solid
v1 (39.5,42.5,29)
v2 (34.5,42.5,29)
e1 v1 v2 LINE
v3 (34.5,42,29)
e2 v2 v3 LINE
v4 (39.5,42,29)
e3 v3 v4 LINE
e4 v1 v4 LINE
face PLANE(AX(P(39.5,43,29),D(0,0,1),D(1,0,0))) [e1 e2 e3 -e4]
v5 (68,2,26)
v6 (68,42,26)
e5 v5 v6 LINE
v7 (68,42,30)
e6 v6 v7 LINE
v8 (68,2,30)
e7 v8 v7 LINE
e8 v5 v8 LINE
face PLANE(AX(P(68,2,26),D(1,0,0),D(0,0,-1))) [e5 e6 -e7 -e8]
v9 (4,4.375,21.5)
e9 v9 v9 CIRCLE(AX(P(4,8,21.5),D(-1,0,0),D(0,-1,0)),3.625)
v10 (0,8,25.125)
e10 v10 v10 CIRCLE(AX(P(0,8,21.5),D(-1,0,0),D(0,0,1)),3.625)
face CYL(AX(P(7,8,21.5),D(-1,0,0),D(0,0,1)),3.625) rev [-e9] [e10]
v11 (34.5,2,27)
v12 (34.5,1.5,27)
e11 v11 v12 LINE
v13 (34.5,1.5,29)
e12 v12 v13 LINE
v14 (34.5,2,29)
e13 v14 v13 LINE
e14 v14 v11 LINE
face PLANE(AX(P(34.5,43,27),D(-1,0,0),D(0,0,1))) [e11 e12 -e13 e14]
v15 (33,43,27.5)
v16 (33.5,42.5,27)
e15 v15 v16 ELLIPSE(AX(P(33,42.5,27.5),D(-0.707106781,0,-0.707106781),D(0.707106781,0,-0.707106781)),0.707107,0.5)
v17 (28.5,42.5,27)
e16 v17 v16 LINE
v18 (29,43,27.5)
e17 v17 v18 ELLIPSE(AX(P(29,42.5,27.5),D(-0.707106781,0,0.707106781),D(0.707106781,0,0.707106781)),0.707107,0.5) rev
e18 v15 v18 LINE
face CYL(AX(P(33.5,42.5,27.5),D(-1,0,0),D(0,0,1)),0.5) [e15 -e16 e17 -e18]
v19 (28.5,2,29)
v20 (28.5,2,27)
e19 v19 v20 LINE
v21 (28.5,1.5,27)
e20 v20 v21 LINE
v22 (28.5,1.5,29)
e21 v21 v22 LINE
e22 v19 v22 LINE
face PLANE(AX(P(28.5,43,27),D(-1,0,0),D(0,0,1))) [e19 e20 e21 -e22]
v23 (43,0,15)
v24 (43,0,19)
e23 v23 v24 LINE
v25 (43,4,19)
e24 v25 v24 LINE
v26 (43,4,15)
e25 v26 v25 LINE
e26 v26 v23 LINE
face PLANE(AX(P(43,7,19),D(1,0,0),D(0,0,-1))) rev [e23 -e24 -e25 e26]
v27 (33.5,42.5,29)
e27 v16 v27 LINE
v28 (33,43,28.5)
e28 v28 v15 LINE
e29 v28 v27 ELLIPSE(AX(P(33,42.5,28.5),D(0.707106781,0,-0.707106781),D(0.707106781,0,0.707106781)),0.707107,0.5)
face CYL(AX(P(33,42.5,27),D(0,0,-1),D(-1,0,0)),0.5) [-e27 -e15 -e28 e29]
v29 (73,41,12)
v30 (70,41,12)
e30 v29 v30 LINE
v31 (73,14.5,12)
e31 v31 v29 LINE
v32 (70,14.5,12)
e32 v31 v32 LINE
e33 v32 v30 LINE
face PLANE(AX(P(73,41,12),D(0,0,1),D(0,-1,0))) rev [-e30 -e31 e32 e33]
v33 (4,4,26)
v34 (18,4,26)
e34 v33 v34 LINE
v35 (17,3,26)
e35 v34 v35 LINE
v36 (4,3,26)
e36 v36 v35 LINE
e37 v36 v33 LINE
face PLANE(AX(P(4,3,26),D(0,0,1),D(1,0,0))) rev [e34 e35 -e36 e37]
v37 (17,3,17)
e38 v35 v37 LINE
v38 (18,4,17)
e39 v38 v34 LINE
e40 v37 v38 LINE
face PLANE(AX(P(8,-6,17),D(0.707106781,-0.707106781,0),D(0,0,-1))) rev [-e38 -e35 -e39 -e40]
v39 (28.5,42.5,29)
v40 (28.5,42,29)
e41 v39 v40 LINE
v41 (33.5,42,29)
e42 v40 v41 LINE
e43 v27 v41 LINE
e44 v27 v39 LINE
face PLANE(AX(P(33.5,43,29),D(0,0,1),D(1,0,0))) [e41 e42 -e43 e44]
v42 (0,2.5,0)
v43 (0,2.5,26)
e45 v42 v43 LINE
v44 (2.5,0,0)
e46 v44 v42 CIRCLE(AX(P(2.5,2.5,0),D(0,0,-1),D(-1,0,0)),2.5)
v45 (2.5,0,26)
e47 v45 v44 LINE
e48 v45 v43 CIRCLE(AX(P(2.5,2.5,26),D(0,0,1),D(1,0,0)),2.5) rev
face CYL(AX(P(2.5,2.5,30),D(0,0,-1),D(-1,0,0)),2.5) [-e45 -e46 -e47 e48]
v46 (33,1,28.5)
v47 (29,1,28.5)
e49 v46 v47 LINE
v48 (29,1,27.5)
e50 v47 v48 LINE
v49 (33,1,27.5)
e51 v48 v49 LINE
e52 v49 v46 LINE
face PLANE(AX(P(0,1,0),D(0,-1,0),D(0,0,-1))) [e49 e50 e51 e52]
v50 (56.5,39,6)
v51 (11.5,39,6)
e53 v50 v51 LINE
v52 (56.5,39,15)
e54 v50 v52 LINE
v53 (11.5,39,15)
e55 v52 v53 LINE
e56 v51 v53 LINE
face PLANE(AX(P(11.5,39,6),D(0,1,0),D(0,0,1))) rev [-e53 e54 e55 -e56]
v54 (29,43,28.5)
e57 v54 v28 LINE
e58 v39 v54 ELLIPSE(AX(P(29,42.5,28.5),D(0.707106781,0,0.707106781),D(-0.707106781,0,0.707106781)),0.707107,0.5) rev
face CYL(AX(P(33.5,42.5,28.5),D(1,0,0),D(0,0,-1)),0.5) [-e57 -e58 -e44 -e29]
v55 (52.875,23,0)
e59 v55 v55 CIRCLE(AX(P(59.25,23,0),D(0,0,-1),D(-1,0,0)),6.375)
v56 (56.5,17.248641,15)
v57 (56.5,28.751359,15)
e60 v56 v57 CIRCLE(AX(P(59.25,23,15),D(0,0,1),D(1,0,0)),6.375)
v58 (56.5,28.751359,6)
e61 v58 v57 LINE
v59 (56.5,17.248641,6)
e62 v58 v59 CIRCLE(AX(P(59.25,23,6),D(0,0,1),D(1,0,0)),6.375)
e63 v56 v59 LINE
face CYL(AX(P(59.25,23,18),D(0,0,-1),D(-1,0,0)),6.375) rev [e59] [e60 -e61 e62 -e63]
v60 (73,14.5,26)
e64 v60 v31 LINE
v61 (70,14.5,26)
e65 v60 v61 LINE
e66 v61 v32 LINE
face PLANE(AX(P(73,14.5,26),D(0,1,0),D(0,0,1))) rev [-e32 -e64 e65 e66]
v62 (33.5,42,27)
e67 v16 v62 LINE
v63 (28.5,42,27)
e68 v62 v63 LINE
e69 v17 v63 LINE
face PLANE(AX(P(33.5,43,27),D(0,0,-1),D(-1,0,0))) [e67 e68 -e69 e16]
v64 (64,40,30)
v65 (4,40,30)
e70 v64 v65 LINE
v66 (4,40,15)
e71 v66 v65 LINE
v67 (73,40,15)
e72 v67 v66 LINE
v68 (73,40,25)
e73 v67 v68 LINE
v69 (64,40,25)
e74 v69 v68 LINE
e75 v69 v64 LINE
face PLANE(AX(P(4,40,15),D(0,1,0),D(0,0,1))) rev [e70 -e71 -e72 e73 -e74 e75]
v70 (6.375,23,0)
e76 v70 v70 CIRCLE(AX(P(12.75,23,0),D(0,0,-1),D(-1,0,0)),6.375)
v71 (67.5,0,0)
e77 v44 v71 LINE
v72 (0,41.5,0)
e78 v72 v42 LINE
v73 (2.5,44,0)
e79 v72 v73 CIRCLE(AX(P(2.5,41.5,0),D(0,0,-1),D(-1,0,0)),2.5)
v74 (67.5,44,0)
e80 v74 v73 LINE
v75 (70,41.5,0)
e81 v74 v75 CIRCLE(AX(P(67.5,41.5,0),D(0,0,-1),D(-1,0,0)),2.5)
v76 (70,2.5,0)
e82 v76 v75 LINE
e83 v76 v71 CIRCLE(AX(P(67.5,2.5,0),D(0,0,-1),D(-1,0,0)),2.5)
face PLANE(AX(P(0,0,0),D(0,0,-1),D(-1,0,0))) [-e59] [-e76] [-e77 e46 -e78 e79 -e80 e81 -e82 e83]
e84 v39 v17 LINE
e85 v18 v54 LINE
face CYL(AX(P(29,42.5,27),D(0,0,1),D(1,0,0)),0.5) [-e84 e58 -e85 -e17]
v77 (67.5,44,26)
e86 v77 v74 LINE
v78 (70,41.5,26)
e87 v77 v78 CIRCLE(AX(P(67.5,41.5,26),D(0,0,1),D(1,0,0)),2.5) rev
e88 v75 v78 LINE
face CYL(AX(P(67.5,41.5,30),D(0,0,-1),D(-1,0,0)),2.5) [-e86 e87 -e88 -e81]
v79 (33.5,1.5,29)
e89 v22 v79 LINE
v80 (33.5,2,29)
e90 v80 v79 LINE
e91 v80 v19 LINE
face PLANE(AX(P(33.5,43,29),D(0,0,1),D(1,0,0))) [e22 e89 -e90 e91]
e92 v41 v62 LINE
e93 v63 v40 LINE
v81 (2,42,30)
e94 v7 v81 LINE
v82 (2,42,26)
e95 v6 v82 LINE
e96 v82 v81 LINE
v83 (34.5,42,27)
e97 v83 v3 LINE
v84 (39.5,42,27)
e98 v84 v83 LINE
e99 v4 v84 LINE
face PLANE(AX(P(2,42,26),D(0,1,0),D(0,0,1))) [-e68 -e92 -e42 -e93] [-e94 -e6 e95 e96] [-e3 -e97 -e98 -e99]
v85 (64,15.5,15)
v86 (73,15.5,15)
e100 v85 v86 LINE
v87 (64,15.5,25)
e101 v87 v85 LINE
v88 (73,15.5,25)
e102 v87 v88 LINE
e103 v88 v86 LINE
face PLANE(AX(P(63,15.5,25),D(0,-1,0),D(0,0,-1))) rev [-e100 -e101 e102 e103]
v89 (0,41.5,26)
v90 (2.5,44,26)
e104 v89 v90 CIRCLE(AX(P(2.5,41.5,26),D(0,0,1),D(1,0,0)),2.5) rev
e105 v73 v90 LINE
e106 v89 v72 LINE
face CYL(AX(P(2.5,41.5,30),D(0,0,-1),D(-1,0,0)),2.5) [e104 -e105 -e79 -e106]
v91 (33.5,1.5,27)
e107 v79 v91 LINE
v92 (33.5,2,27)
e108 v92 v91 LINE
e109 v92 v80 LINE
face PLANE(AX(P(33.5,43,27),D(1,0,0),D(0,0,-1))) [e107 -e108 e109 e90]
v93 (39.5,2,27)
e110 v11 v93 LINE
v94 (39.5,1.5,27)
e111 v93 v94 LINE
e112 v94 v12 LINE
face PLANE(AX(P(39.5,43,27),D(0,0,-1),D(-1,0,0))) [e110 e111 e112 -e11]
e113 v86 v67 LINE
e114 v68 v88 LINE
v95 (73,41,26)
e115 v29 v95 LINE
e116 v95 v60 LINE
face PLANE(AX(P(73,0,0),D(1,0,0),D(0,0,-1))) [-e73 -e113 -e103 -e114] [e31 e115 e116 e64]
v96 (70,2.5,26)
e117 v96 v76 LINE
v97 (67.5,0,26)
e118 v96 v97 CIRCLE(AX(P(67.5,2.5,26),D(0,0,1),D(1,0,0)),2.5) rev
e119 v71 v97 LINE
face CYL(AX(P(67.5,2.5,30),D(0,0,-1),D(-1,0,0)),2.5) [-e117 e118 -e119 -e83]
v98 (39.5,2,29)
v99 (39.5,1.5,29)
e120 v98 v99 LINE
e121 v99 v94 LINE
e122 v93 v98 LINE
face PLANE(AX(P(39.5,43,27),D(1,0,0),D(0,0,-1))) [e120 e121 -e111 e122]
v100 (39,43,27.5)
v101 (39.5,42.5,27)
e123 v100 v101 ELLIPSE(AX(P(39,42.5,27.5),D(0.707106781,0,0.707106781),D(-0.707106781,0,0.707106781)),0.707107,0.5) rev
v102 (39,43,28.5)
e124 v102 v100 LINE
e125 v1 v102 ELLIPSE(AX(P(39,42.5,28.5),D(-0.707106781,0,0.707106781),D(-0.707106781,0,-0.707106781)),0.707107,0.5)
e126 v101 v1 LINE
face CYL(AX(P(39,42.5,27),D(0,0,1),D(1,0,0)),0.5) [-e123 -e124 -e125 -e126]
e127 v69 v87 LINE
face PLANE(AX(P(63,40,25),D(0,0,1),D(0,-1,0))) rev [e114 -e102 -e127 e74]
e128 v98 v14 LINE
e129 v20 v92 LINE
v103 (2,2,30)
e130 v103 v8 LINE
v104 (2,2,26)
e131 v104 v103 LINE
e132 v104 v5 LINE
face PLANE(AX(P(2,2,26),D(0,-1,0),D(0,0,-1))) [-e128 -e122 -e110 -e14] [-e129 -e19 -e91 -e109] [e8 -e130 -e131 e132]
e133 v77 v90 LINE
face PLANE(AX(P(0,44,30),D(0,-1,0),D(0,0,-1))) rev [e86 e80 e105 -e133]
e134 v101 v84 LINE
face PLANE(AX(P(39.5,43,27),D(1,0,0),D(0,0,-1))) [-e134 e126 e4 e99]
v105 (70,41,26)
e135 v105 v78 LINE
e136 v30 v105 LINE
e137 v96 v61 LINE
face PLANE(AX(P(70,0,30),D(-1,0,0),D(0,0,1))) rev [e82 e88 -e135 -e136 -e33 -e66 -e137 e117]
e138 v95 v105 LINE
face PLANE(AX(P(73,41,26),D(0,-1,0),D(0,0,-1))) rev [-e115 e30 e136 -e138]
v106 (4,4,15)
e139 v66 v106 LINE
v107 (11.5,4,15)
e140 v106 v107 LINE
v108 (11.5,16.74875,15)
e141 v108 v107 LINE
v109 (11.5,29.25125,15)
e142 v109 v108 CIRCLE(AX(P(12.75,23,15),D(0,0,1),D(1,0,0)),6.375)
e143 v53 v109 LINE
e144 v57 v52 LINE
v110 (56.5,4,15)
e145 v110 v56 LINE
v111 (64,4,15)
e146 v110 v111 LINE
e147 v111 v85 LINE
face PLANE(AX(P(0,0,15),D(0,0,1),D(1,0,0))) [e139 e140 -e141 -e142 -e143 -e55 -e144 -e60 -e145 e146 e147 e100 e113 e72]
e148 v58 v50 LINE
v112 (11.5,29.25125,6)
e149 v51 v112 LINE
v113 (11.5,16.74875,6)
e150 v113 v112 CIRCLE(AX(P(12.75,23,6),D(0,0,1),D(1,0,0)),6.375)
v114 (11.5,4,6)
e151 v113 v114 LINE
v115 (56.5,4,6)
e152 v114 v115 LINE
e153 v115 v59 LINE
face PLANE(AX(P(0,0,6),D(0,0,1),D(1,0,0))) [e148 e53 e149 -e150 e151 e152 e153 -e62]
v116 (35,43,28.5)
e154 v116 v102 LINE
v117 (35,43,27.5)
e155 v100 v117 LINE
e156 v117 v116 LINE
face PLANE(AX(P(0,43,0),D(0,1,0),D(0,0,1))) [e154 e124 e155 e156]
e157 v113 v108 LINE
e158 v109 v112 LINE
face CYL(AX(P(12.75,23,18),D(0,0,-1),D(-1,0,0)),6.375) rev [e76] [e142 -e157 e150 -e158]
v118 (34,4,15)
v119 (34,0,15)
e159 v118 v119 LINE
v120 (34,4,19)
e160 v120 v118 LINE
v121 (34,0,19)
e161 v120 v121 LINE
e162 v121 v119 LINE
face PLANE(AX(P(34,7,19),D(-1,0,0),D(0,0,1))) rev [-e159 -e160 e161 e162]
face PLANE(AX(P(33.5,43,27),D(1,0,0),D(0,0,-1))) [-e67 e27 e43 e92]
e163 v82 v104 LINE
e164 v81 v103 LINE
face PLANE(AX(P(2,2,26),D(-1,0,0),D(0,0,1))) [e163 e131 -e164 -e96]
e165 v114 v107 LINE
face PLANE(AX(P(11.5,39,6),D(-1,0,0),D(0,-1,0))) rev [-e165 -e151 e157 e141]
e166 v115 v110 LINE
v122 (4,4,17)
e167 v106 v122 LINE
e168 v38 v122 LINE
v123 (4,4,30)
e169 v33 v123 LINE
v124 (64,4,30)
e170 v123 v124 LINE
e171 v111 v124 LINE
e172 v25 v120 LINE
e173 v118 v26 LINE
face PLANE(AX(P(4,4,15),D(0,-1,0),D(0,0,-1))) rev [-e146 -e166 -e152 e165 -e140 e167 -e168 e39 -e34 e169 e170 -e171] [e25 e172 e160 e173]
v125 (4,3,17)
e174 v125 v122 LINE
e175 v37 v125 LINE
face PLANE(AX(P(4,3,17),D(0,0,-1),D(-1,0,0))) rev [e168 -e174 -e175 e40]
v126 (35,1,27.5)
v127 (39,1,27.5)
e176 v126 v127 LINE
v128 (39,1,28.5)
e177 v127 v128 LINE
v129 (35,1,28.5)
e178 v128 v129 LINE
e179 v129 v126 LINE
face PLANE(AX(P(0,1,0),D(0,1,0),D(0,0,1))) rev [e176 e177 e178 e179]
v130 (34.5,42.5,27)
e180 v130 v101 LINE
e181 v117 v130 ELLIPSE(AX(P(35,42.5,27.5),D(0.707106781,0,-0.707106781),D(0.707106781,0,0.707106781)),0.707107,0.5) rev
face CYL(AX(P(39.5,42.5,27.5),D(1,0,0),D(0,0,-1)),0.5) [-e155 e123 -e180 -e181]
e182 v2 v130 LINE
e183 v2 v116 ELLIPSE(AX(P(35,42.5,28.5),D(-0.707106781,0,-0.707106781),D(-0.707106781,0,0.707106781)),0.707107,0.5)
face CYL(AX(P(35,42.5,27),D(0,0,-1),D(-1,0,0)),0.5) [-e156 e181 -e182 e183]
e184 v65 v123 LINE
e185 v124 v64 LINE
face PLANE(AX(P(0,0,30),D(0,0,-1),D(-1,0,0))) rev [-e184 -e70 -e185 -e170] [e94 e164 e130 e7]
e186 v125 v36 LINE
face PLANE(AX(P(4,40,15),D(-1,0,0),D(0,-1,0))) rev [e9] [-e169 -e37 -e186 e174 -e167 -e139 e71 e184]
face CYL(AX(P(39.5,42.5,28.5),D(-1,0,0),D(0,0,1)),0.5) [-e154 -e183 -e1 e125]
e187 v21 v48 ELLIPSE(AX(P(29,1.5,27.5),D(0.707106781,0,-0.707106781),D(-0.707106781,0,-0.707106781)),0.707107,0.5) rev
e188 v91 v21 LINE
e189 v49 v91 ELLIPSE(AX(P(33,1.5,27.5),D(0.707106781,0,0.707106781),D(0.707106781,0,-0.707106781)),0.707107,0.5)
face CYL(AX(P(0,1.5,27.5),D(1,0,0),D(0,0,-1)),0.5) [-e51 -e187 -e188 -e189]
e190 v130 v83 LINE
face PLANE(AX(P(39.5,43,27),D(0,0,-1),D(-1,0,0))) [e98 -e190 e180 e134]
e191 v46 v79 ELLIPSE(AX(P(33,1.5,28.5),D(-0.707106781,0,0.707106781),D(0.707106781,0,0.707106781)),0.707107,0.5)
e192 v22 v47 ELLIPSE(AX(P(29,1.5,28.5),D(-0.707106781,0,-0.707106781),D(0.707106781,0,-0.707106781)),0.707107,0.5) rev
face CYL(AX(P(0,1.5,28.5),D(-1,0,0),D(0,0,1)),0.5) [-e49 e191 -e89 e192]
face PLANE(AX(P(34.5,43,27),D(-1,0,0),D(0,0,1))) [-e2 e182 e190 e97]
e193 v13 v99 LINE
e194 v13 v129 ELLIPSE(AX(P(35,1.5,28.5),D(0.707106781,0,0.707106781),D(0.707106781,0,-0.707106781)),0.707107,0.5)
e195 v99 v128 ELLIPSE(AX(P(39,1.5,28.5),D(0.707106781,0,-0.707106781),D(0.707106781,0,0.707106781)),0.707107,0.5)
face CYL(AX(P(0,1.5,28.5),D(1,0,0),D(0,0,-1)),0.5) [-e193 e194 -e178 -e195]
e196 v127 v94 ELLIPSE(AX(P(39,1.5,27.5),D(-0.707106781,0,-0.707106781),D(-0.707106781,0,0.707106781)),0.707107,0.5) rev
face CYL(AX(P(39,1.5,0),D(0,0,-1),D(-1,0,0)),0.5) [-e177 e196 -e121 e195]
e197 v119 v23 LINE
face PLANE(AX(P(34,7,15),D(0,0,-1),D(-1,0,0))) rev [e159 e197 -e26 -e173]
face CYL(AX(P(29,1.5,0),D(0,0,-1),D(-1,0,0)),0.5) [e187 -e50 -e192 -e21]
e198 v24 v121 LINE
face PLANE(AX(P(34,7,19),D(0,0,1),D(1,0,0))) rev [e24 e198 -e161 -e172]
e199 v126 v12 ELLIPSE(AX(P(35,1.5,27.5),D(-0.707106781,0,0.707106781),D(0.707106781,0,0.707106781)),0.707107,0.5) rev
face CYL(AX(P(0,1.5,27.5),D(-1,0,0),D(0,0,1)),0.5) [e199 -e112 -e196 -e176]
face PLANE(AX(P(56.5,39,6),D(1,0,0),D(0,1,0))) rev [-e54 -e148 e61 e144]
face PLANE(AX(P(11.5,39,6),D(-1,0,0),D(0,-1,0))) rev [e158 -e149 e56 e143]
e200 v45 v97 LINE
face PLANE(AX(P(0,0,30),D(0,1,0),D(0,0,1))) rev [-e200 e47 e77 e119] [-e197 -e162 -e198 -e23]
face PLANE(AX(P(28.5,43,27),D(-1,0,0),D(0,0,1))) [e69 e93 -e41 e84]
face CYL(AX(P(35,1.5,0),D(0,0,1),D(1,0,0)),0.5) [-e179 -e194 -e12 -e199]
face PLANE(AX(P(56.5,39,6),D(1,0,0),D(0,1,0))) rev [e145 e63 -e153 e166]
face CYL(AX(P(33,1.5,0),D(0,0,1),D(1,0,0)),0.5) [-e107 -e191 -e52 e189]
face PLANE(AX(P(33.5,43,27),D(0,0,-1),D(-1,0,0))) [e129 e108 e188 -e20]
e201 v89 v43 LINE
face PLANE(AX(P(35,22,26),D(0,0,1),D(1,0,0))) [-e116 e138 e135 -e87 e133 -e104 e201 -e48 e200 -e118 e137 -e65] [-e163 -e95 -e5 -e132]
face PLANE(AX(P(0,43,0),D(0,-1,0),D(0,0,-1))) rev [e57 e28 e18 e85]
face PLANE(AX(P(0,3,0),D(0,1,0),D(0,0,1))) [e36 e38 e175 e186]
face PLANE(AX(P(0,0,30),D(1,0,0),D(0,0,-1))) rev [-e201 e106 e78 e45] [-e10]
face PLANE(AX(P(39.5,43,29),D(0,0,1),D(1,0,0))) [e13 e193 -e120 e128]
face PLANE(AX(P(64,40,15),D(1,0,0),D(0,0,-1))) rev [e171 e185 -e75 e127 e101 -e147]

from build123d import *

# Parameters (mm, degrees)
SKETCH1_W                   = 70
SKETCH1_H                   = 44
MIAN_BOSS_EXTRUDE_DEPTH     = 30
SKETCH2_W                   = 60
SKETCH2_H                   = 36
MAIN_CUT_DEPTH              = 15
SKETCH4_W                   = 45
SKETCH4_H                   = 35
BATTERY_CUT_DEPTH           = 9
SKETCH5_R                   = 6.375
ELCTRODE_CUT_DEPTH          = 18
SKETCH6_W                   = 10
SKETCH6_H                   = 24.5
USB_C_CUT_DEPTH             = 7
SKETCH7_R                   = 3.625
BUTTON_CUT_DEPTH            = 7
SKETCH8_W                   = 9
SKETCH8_H                   = 4
SWITCH_CUT_DEPTH            = 7
OUTSIDE_FILLET_R            = 2.5
SKETCH10_OUTSIDE_W          = 89.59
SKETCH10_OUTSIDE_H          = 63.59
SKETCH10_OUTSIDE_W_2        = 66
SKETCH10_OUTSIDE_H_2        = 40
OUTER_LID_EXTRUDE_DEPTH     = 4
LID_SNAP_EXTRUDE_DEPTH      = 1
LID_SNAP_EXTRUDE_DEPTH_BACK = 41
SKETCH11_W                  = 5
SKETCH11_H                  = 2
SKETCH13_W                  = 11
SKETCH13_H                  = 36
INNER_LID_EXTRUDE_DEPTH     = 3
SKETCH14_W                  = 14
SKETCH14_H                  = 26.5
SKETCH14_W_2                = 10
SKETCH14_H_2                = 24.5
USB_COVER_EXTRUDE_DEPTH     = 3
SKETCH15_W                  = 4
SKETCH15_H                  = 9
BUTTON_SIDE_CUT_DEPTH       = 1
CHAMFER1_SIZE               = 10
LID_SNAP_FILLET_R           = 0.5


with BuildPart() as part:
    # Sketch1 → Mian Boss Extrude (new body)
    with BuildSketch(Plane.XY):
        with Locations((35, 22)):
            Rectangle(SKETCH1_W, SKETCH1_H)
    extrude(amount=MIAN_BOSS_EXTRUDE_DEPTH)

    # Sketch2 → Main cut (cut)
    with BuildSketch(Plane.XY.offset(30)):
        with Locations((34, 22)):
            Rectangle(SKETCH2_W, SKETCH2_H)
    extrude(amount=-MAIN_CUT_DEPTH, mode=Mode.SUBTRACT)

    # Sketch4 → Battery Cut (cut)
    with BuildSketch(Plane.XY.offset(15)):
        with Locations((34, 21.5)):
            Rectangle(SKETCH4_W, SKETCH4_H)
    extrude(amount=-BATTERY_CUT_DEPTH, mode=Mode.SUBTRACT)

    # Sketch5 → Elctrode Cut (cut)
    with BuildSketch(Plane(origin=(0, 0, 0), x_dir=(-1, 0, 0), z_dir=(0, 0, -1))):
        with Locations((-59.25, 23)):
            Circle(SKETCH5_R)
        with Locations((-12.75, 23)):
            Circle(SKETCH5_R)
    extrude(amount=-ELCTRODE_CUT_DEPTH, mode=Mode.SUBTRACT)

    # Sketch6 → USB-c Cut (cut)
    with BuildSketch(Plane(origin=(70, 0, 0), x_dir=(0, 0, -1), z_dir=(1, 0, 0))):
        with Locations((-20, 27.75)):
            Rectangle(SKETCH6_W, SKETCH6_H)
    extrude(amount=-USB_C_CUT_DEPTH, mode=Mode.SUBTRACT)

    # Sketch7 → Button Cut (cut)
    with BuildSketch(Plane.ZY):
        with Locations((21.5, 8)):
            Circle(SKETCH7_R)
    extrude(amount=-BUTTON_CUT_DEPTH, mode=Mode.SUBTRACT)

    # Sketch8 → Switch Cut (cut)
    with BuildSketch(Plane.XZ):
        with Locations((38.5, 17)):
            Rectangle(SKETCH8_W, SKETCH8_H)
    extrude(amount=-SWITCH_CUT_DEPTH, mode=Mode.SUBTRACT)

    # Outside Fillet
    outside_fillet_edges = [part.edges().sort_by_distance(p)[0] for p in [
        (0, 44, 15),
        (70, 44, 15),
        (70, 0, 15),
        (0, 0, 15),
    ]]
    fillet(outside_fillet_edges, radius=OUTSIDE_FILLET_R)

    # Sketch10 outside → Outer lid Extrude (cut)
    with BuildSketch(Plane.XY.offset(30)):
        with Locations((35, 22)):
            Rectangle(SKETCH10_OUTSIDE_W, SKETCH10_OUTSIDE_H)
        with Locations((35, 22)):
            Rectangle(SKETCH10_OUTSIDE_W_2, SKETCH10_OUTSIDE_H_2, mode=Mode.SUBTRACT)
    extrude(amount=-OUTER_LID_EXTRUDE_DEPTH, mode=Mode.SUBTRACT)

    # Sketch11 → Lid Snap-Extrude (add, two sides: drawn at the far end of the back side and taken through both)
    with BuildSketch(Plane.XZ.offset(-2).offset(-LID_SNAP_EXTRUDE_DEPTH_BACK)):
        with Locations((31, 28)):
            Rectangle(SKETCH11_W, SKETCH11_H)
        with Locations((37, 28)):
            Rectangle(SKETCH11_W, SKETCH11_H)
    extrude(amount=LID_SNAP_EXTRUDE_DEPTH + LID_SNAP_EXTRUDE_DEPTH_BACK)

    # Sketch13 → Inner Lid-Extrude (cut)
    with BuildSketch(Plane.XY.offset(29)):
        with Locations((34, 22)):
            Rectangle(SKETCH13_W, SKETCH13_H)
    extrude(amount=-INNER_LID_EXTRUDE_DEPTH, mode=Mode.SUBTRACT)

    # Sketch14 → USB Cover-Extrude (add)
    with BuildSketch(Plane(origin=(70, 0, 0), x_dir=(0, 0, -1), z_dir=(1, 0, 0))):
        with Locations((-19, 27.75)):
            Rectangle(SKETCH14_W, SKETCH14_H)
        with Locations((-20, 27.75)):
            Rectangle(SKETCH14_W_2, SKETCH14_H_2, mode=Mode.SUBTRACT)
    extrude(amount=USB_COVER_EXTRUDE_DEPTH)

    # Sketch15 → Button side cut (cut)
    with BuildSketch(Plane(origin=(0, 4, 0), x_dir=(1, 0, 0), z_dir=(0, 1, 0))):
        with Locations((6, -21.5)):
            Rectangle(SKETCH15_W, SKETCH15_H)
    extrude(amount=-BUTTON_SIDE_CUT_DEPTH, mode=Mode.SUBTRACT)

    # Chamfer1
    # the kernel refuses this chamfer: 10 mm, written as the material it takes off along each edge
    with BuildSketch(Plane(origin=(8, 4, 17), x_dir=(0.9996219169112968, 0.027495876610586403, 0), z_dir=(0, 0, 1))) as chamfer1_piece_1_section:
        Polygon((CHAMFER1_SIZE * 0.999621916911, -CHAMFER1_SIZE * 0.0274958766106), (-CHAMFER1_SIZE * 0.0274958766106, -CHAMFER1_SIZE * 0.999621916911), (0, 0), align=None)
    chamfer1_piece_1 = extrude(amount=9, mode=Mode.PRIVATE)
    chamfer1_piece_1 = split(chamfer1_piece_1, bisect_by=Plane(origin=(14.506944444, 3, 21.5), z_dir=(0, 1, 0)), keep=Keep.TOP, mode=Mode.PRIVATE)
    add(chamfer1_piece_1, mode=Mode.SUBTRACT)

    # Lid Snap Fillet
    lid_snap_fillet_edges = [part.edges().sort_by_distance(p)[0] for p in [
        (28.5, 43, 28),
        (31, 43, 29),
        (33.5, 43, 28),
        (31, 43, 27),
        (28.5, 1, 28),
        (31, 1, 27),
        (33.5, 1, 28),
        (31, 1, 29),
        (37, 43, 29),
        (39.5, 43, 28),
        (37, 43, 27),
        (34.5, 43, 28),
        (37, 1, 29),
        (34.5, 1, 28),
        (37, 1, 27),
        (39.5, 1, 28),
    ]]
    fillet(lid_snap_fillet_edges, radius=LID_SNAP_FILLET_R)


solid = part.part
